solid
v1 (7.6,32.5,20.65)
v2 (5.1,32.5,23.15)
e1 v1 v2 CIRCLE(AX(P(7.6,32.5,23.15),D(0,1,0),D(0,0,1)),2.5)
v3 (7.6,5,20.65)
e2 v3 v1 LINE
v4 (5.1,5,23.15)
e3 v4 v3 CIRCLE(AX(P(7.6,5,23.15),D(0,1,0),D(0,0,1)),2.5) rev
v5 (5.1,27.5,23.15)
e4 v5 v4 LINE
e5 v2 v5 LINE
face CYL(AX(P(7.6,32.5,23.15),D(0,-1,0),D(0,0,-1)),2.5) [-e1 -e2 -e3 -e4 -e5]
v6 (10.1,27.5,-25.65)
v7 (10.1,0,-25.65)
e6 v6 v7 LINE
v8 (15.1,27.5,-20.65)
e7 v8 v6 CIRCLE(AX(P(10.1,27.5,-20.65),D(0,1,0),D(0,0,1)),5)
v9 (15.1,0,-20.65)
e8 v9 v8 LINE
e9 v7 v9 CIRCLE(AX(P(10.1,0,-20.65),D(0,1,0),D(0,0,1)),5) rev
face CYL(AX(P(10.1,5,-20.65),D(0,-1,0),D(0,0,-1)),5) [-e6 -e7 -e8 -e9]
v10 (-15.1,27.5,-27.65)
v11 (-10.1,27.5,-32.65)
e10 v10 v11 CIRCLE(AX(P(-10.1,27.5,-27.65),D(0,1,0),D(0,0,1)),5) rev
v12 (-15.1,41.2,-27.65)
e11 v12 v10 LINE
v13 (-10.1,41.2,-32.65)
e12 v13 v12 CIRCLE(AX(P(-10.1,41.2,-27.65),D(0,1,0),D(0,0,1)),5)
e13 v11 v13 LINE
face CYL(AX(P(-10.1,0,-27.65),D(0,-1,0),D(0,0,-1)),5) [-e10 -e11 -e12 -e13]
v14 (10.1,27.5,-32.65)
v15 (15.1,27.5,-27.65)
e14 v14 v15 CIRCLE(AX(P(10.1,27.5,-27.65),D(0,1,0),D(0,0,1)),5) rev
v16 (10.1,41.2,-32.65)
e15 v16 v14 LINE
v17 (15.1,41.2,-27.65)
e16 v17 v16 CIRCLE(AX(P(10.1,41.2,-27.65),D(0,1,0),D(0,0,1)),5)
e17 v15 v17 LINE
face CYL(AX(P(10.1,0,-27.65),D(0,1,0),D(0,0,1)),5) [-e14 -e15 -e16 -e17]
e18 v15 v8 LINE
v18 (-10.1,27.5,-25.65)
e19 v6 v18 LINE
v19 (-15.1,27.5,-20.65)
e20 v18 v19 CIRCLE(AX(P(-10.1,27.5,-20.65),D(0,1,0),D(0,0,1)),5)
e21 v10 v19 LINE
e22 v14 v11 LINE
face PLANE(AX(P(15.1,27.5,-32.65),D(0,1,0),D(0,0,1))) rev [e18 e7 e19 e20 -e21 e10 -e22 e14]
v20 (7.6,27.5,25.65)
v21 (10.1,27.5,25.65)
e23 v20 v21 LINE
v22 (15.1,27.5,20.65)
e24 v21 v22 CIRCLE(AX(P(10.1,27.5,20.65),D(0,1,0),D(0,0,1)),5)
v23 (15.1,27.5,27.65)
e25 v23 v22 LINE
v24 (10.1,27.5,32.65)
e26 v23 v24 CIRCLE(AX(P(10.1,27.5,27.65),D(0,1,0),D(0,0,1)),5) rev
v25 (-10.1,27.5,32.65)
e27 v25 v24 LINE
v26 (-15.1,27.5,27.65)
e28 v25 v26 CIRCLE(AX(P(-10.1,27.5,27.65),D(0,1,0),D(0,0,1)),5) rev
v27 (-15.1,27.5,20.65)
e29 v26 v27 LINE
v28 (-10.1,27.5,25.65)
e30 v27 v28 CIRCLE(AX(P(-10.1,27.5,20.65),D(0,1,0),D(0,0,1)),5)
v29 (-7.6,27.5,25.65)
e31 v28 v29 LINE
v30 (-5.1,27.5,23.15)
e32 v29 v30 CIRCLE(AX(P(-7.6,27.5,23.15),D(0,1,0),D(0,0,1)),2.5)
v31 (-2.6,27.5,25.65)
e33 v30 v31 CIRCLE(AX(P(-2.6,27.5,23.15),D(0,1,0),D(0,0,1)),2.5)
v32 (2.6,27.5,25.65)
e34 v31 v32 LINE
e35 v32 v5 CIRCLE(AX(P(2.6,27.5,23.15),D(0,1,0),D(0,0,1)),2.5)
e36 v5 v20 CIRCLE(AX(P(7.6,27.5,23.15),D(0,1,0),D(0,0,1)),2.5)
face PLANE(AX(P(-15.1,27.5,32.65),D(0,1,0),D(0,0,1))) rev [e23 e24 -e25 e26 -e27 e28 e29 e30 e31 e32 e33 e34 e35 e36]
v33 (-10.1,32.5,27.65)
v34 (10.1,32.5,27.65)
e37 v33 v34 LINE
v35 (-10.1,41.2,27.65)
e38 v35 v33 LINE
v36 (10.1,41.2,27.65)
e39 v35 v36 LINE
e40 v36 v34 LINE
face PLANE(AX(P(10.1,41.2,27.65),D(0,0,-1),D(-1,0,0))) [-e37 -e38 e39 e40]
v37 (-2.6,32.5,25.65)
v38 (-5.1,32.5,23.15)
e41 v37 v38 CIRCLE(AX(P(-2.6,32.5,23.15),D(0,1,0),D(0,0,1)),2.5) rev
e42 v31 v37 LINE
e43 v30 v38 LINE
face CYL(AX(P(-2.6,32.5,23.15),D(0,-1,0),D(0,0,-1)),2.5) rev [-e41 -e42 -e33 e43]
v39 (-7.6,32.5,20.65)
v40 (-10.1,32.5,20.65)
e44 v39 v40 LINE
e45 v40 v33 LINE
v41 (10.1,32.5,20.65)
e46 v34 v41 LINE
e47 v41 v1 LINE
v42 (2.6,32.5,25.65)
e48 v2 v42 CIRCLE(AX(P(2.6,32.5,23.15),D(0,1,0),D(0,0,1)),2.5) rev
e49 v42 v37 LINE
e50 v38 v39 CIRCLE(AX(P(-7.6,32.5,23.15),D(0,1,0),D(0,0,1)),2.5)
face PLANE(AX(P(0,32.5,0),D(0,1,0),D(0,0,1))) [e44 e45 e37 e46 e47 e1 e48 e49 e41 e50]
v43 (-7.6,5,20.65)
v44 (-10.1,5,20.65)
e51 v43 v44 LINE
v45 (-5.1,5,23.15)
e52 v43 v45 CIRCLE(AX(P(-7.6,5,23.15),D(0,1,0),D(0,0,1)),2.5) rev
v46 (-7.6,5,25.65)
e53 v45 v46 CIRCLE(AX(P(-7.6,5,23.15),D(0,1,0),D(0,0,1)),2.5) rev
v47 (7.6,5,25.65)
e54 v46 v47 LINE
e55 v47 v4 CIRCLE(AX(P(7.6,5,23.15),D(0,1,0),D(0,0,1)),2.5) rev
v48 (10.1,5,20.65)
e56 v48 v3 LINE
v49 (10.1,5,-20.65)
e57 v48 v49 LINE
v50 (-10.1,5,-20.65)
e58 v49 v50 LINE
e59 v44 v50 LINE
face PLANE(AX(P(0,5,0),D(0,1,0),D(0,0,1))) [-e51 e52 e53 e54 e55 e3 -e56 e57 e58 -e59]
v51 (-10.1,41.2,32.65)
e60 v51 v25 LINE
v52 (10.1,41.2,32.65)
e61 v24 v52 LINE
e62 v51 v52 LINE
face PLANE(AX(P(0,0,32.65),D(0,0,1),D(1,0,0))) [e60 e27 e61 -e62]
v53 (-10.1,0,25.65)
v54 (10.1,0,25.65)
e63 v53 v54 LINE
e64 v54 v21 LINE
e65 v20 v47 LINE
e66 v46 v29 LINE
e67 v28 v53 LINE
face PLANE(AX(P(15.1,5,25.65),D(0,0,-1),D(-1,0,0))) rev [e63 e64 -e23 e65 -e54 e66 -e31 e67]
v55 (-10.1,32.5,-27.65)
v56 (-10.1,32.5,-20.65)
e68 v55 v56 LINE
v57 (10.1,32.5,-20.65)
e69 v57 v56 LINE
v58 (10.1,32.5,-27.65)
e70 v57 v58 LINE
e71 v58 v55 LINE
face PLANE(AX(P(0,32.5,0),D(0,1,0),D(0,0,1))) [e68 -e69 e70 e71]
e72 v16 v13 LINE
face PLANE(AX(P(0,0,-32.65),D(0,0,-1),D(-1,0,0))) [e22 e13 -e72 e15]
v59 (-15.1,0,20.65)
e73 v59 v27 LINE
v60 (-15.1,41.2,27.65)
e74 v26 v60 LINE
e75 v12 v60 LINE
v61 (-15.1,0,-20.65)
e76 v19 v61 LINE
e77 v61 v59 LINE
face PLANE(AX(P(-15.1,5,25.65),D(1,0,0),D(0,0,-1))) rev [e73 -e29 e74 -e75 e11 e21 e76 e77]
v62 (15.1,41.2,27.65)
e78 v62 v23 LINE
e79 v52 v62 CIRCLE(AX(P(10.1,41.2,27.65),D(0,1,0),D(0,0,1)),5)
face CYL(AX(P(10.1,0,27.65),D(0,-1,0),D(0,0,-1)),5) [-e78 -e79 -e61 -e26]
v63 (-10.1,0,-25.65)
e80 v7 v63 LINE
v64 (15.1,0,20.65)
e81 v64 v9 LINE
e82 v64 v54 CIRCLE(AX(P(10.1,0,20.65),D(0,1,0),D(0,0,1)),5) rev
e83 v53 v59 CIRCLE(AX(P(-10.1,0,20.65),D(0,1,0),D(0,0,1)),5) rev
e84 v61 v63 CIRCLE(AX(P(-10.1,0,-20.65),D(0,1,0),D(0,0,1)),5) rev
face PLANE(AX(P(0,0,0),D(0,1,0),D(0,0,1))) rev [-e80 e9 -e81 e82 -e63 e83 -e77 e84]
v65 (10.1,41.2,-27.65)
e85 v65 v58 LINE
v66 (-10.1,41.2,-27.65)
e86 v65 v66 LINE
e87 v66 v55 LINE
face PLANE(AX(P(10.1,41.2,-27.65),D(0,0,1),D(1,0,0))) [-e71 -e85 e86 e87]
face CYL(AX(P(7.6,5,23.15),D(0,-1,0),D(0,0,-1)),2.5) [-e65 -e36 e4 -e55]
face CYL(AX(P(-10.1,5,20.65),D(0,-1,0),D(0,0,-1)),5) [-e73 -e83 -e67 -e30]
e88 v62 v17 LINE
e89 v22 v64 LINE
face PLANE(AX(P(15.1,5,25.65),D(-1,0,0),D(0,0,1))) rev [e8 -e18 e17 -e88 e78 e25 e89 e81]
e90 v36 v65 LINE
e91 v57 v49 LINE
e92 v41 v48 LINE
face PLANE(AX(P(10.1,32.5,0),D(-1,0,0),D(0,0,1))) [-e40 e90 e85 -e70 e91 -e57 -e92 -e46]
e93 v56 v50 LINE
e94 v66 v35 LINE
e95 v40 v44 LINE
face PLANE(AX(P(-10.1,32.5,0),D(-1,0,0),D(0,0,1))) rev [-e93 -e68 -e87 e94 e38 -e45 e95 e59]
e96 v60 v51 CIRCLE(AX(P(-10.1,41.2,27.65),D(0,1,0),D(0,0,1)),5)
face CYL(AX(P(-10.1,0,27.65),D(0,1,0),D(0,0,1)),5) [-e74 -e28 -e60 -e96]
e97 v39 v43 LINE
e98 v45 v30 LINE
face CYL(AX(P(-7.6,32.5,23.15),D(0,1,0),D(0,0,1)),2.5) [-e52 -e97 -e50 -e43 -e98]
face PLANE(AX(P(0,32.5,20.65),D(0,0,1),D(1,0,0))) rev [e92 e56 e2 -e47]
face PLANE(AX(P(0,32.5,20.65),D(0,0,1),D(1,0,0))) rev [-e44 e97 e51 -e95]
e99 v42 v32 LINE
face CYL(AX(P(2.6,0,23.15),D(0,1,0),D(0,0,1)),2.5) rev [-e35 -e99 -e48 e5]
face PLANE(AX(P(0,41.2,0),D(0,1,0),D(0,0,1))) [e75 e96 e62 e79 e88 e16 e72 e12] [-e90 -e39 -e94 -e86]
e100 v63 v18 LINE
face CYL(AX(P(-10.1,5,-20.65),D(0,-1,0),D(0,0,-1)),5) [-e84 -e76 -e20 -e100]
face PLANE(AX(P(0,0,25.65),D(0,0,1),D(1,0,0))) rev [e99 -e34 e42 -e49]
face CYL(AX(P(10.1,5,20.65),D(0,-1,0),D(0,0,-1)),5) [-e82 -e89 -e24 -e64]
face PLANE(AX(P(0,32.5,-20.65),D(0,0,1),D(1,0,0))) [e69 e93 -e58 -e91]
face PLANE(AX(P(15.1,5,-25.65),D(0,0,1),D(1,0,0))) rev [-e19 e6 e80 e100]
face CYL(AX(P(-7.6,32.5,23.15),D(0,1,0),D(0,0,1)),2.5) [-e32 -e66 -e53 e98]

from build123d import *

# Parameters (mm, degrees)
SKETCH1_W           = 30.2
SKETCH1_H           = 51.3
BOSS_EXTRUDE1_DEPTH = 5
BOSS_EXTRUDE2_DEPTH = 27.5
SKETCH3_W           = 30.2
SKETCH3_H           = 5
BOSS_EXTRUDE3_DEPTH = 7
SKETCH4_W           = 30.2
SKETCH4_H           = 5
BOSS_EXTRUDE4_DEPTH = 7
SKETCH5_W           = 30.2
SKETCH5_H           = 65.3
SKETCH5_W_2         = 20.2
SKETCH5_H_2         = 55.3
BOSS_EXTRUDE5_DEPTH = 8.7
FILLET1_R           = 5
FILLET2_R           = 2.5
FILLET3_R           = 2.5


with BuildPart() as part:
    # Sketch1 → Boss-Extrude1 (new body)
    with BuildSketch(Plane(origin=(0, 0, 0), x_dir=(1, 0, 0), z_dir=(0, 1, 0))):
        Rectangle(SKETCH1_W, SKETCH1_H)
    extrude(amount=BOSS_EXTRUDE1_DEPTH)

    # Sketch2 → Boss-Extrude2 (add)
    with BuildSketch(Plane(origin=(0, 5, 0), x_dir=(1, 0, 0), z_dir=(0, 1, 0))):
        Polygon((10.1, -20.65), (5.1, -20.65), (5.1, -25.65), (15.1, -25.65), (15.1, 25.65), (-15.1, 25.65), (-15.1, -25.65), (-5.1, -25.65), (-5.1, -20.65), (-10.1, -20.65), (-10.1, 20.65), (10.1, 20.65), align=None)
    extrude(amount=BOSS_EXTRUDE2_DEPTH)

    # Sketch3 → Boss-Extrude3 (add)
    with BuildSketch(Plane.XY.offset(25.65)):
        with Locations((0, 30)):
            Rectangle(SKETCH3_W, SKETCH3_H)
    extrude(amount=BOSS_EXTRUDE3_DEPTH)

    # Sketch4 → Boss-Extrude4 (add)
    with BuildSketch(Plane(origin=(0, 0, -25.65), x_dir=(-1, 0, 0), z_dir=(0, 0, -1))):
        with Locations((0, 30)):
            Rectangle(SKETCH4_W, SKETCH4_H)
    extrude(amount=BOSS_EXTRUDE4_DEPTH)

    # Sketch5 → Boss-Extrude5 (add)
    with BuildSketch(Plane(origin=(0, 32.5, 0), x_dir=(1, 0, 0), z_dir=(0, 1, 0))):
        Rectangle(SKETCH5_W, SKETCH5_H)
        Rectangle(SKETCH5_W_2, SKETCH5_H_2, mode=Mode.SUBTRACT)
    extrude(amount=BOSS_EXTRUDE5_DEPTH)

    # Fillet1
    fillet1_edges = [part.edges().sort_by_distance(p)[0] for p in [
        (15.1, 13.75, 25.65),
        (-15.1, 13.75, 25.65),
        (-15.1, 34.35, 32.65),
        (15.1, 34.35, 32.65),
        (-15.1, 13.75, -25.65),
        (15.1, 13.75, -25.65),
        (15.1, 34.35, -32.65),
        (-15.1, 34.35, -32.65),
    ]]
    fillet(fillet1_edges, radius=FILLET1_R)

    # Fillet2
    fillet2_edges = [part.edges().sort_by_distance(p)[0] for p in [
        (-5.1, 16.25, 25.65),
        (5.1, 16.25, 25.65),
        (-5.1, 18.75, 20.65),
        (5.1, 18.75, 20.65),
    ]]
    fillet(fillet2_edges, radius=FILLET2_R - 0.0001)  # a hair under: the kernel refuses the full size

    # Fillet3
    fillet3_edges = [part.edges().sort_by_distance(p)[0] for p in [
        (-5.1, 30, 25.65),
        (5.1, 30, 25.65),
    ]]
    fillet(fillet3_edges, radius=FILLET3_R - 0.0001)  # a hair under: the kernel refuses the full size


solid = part.part
